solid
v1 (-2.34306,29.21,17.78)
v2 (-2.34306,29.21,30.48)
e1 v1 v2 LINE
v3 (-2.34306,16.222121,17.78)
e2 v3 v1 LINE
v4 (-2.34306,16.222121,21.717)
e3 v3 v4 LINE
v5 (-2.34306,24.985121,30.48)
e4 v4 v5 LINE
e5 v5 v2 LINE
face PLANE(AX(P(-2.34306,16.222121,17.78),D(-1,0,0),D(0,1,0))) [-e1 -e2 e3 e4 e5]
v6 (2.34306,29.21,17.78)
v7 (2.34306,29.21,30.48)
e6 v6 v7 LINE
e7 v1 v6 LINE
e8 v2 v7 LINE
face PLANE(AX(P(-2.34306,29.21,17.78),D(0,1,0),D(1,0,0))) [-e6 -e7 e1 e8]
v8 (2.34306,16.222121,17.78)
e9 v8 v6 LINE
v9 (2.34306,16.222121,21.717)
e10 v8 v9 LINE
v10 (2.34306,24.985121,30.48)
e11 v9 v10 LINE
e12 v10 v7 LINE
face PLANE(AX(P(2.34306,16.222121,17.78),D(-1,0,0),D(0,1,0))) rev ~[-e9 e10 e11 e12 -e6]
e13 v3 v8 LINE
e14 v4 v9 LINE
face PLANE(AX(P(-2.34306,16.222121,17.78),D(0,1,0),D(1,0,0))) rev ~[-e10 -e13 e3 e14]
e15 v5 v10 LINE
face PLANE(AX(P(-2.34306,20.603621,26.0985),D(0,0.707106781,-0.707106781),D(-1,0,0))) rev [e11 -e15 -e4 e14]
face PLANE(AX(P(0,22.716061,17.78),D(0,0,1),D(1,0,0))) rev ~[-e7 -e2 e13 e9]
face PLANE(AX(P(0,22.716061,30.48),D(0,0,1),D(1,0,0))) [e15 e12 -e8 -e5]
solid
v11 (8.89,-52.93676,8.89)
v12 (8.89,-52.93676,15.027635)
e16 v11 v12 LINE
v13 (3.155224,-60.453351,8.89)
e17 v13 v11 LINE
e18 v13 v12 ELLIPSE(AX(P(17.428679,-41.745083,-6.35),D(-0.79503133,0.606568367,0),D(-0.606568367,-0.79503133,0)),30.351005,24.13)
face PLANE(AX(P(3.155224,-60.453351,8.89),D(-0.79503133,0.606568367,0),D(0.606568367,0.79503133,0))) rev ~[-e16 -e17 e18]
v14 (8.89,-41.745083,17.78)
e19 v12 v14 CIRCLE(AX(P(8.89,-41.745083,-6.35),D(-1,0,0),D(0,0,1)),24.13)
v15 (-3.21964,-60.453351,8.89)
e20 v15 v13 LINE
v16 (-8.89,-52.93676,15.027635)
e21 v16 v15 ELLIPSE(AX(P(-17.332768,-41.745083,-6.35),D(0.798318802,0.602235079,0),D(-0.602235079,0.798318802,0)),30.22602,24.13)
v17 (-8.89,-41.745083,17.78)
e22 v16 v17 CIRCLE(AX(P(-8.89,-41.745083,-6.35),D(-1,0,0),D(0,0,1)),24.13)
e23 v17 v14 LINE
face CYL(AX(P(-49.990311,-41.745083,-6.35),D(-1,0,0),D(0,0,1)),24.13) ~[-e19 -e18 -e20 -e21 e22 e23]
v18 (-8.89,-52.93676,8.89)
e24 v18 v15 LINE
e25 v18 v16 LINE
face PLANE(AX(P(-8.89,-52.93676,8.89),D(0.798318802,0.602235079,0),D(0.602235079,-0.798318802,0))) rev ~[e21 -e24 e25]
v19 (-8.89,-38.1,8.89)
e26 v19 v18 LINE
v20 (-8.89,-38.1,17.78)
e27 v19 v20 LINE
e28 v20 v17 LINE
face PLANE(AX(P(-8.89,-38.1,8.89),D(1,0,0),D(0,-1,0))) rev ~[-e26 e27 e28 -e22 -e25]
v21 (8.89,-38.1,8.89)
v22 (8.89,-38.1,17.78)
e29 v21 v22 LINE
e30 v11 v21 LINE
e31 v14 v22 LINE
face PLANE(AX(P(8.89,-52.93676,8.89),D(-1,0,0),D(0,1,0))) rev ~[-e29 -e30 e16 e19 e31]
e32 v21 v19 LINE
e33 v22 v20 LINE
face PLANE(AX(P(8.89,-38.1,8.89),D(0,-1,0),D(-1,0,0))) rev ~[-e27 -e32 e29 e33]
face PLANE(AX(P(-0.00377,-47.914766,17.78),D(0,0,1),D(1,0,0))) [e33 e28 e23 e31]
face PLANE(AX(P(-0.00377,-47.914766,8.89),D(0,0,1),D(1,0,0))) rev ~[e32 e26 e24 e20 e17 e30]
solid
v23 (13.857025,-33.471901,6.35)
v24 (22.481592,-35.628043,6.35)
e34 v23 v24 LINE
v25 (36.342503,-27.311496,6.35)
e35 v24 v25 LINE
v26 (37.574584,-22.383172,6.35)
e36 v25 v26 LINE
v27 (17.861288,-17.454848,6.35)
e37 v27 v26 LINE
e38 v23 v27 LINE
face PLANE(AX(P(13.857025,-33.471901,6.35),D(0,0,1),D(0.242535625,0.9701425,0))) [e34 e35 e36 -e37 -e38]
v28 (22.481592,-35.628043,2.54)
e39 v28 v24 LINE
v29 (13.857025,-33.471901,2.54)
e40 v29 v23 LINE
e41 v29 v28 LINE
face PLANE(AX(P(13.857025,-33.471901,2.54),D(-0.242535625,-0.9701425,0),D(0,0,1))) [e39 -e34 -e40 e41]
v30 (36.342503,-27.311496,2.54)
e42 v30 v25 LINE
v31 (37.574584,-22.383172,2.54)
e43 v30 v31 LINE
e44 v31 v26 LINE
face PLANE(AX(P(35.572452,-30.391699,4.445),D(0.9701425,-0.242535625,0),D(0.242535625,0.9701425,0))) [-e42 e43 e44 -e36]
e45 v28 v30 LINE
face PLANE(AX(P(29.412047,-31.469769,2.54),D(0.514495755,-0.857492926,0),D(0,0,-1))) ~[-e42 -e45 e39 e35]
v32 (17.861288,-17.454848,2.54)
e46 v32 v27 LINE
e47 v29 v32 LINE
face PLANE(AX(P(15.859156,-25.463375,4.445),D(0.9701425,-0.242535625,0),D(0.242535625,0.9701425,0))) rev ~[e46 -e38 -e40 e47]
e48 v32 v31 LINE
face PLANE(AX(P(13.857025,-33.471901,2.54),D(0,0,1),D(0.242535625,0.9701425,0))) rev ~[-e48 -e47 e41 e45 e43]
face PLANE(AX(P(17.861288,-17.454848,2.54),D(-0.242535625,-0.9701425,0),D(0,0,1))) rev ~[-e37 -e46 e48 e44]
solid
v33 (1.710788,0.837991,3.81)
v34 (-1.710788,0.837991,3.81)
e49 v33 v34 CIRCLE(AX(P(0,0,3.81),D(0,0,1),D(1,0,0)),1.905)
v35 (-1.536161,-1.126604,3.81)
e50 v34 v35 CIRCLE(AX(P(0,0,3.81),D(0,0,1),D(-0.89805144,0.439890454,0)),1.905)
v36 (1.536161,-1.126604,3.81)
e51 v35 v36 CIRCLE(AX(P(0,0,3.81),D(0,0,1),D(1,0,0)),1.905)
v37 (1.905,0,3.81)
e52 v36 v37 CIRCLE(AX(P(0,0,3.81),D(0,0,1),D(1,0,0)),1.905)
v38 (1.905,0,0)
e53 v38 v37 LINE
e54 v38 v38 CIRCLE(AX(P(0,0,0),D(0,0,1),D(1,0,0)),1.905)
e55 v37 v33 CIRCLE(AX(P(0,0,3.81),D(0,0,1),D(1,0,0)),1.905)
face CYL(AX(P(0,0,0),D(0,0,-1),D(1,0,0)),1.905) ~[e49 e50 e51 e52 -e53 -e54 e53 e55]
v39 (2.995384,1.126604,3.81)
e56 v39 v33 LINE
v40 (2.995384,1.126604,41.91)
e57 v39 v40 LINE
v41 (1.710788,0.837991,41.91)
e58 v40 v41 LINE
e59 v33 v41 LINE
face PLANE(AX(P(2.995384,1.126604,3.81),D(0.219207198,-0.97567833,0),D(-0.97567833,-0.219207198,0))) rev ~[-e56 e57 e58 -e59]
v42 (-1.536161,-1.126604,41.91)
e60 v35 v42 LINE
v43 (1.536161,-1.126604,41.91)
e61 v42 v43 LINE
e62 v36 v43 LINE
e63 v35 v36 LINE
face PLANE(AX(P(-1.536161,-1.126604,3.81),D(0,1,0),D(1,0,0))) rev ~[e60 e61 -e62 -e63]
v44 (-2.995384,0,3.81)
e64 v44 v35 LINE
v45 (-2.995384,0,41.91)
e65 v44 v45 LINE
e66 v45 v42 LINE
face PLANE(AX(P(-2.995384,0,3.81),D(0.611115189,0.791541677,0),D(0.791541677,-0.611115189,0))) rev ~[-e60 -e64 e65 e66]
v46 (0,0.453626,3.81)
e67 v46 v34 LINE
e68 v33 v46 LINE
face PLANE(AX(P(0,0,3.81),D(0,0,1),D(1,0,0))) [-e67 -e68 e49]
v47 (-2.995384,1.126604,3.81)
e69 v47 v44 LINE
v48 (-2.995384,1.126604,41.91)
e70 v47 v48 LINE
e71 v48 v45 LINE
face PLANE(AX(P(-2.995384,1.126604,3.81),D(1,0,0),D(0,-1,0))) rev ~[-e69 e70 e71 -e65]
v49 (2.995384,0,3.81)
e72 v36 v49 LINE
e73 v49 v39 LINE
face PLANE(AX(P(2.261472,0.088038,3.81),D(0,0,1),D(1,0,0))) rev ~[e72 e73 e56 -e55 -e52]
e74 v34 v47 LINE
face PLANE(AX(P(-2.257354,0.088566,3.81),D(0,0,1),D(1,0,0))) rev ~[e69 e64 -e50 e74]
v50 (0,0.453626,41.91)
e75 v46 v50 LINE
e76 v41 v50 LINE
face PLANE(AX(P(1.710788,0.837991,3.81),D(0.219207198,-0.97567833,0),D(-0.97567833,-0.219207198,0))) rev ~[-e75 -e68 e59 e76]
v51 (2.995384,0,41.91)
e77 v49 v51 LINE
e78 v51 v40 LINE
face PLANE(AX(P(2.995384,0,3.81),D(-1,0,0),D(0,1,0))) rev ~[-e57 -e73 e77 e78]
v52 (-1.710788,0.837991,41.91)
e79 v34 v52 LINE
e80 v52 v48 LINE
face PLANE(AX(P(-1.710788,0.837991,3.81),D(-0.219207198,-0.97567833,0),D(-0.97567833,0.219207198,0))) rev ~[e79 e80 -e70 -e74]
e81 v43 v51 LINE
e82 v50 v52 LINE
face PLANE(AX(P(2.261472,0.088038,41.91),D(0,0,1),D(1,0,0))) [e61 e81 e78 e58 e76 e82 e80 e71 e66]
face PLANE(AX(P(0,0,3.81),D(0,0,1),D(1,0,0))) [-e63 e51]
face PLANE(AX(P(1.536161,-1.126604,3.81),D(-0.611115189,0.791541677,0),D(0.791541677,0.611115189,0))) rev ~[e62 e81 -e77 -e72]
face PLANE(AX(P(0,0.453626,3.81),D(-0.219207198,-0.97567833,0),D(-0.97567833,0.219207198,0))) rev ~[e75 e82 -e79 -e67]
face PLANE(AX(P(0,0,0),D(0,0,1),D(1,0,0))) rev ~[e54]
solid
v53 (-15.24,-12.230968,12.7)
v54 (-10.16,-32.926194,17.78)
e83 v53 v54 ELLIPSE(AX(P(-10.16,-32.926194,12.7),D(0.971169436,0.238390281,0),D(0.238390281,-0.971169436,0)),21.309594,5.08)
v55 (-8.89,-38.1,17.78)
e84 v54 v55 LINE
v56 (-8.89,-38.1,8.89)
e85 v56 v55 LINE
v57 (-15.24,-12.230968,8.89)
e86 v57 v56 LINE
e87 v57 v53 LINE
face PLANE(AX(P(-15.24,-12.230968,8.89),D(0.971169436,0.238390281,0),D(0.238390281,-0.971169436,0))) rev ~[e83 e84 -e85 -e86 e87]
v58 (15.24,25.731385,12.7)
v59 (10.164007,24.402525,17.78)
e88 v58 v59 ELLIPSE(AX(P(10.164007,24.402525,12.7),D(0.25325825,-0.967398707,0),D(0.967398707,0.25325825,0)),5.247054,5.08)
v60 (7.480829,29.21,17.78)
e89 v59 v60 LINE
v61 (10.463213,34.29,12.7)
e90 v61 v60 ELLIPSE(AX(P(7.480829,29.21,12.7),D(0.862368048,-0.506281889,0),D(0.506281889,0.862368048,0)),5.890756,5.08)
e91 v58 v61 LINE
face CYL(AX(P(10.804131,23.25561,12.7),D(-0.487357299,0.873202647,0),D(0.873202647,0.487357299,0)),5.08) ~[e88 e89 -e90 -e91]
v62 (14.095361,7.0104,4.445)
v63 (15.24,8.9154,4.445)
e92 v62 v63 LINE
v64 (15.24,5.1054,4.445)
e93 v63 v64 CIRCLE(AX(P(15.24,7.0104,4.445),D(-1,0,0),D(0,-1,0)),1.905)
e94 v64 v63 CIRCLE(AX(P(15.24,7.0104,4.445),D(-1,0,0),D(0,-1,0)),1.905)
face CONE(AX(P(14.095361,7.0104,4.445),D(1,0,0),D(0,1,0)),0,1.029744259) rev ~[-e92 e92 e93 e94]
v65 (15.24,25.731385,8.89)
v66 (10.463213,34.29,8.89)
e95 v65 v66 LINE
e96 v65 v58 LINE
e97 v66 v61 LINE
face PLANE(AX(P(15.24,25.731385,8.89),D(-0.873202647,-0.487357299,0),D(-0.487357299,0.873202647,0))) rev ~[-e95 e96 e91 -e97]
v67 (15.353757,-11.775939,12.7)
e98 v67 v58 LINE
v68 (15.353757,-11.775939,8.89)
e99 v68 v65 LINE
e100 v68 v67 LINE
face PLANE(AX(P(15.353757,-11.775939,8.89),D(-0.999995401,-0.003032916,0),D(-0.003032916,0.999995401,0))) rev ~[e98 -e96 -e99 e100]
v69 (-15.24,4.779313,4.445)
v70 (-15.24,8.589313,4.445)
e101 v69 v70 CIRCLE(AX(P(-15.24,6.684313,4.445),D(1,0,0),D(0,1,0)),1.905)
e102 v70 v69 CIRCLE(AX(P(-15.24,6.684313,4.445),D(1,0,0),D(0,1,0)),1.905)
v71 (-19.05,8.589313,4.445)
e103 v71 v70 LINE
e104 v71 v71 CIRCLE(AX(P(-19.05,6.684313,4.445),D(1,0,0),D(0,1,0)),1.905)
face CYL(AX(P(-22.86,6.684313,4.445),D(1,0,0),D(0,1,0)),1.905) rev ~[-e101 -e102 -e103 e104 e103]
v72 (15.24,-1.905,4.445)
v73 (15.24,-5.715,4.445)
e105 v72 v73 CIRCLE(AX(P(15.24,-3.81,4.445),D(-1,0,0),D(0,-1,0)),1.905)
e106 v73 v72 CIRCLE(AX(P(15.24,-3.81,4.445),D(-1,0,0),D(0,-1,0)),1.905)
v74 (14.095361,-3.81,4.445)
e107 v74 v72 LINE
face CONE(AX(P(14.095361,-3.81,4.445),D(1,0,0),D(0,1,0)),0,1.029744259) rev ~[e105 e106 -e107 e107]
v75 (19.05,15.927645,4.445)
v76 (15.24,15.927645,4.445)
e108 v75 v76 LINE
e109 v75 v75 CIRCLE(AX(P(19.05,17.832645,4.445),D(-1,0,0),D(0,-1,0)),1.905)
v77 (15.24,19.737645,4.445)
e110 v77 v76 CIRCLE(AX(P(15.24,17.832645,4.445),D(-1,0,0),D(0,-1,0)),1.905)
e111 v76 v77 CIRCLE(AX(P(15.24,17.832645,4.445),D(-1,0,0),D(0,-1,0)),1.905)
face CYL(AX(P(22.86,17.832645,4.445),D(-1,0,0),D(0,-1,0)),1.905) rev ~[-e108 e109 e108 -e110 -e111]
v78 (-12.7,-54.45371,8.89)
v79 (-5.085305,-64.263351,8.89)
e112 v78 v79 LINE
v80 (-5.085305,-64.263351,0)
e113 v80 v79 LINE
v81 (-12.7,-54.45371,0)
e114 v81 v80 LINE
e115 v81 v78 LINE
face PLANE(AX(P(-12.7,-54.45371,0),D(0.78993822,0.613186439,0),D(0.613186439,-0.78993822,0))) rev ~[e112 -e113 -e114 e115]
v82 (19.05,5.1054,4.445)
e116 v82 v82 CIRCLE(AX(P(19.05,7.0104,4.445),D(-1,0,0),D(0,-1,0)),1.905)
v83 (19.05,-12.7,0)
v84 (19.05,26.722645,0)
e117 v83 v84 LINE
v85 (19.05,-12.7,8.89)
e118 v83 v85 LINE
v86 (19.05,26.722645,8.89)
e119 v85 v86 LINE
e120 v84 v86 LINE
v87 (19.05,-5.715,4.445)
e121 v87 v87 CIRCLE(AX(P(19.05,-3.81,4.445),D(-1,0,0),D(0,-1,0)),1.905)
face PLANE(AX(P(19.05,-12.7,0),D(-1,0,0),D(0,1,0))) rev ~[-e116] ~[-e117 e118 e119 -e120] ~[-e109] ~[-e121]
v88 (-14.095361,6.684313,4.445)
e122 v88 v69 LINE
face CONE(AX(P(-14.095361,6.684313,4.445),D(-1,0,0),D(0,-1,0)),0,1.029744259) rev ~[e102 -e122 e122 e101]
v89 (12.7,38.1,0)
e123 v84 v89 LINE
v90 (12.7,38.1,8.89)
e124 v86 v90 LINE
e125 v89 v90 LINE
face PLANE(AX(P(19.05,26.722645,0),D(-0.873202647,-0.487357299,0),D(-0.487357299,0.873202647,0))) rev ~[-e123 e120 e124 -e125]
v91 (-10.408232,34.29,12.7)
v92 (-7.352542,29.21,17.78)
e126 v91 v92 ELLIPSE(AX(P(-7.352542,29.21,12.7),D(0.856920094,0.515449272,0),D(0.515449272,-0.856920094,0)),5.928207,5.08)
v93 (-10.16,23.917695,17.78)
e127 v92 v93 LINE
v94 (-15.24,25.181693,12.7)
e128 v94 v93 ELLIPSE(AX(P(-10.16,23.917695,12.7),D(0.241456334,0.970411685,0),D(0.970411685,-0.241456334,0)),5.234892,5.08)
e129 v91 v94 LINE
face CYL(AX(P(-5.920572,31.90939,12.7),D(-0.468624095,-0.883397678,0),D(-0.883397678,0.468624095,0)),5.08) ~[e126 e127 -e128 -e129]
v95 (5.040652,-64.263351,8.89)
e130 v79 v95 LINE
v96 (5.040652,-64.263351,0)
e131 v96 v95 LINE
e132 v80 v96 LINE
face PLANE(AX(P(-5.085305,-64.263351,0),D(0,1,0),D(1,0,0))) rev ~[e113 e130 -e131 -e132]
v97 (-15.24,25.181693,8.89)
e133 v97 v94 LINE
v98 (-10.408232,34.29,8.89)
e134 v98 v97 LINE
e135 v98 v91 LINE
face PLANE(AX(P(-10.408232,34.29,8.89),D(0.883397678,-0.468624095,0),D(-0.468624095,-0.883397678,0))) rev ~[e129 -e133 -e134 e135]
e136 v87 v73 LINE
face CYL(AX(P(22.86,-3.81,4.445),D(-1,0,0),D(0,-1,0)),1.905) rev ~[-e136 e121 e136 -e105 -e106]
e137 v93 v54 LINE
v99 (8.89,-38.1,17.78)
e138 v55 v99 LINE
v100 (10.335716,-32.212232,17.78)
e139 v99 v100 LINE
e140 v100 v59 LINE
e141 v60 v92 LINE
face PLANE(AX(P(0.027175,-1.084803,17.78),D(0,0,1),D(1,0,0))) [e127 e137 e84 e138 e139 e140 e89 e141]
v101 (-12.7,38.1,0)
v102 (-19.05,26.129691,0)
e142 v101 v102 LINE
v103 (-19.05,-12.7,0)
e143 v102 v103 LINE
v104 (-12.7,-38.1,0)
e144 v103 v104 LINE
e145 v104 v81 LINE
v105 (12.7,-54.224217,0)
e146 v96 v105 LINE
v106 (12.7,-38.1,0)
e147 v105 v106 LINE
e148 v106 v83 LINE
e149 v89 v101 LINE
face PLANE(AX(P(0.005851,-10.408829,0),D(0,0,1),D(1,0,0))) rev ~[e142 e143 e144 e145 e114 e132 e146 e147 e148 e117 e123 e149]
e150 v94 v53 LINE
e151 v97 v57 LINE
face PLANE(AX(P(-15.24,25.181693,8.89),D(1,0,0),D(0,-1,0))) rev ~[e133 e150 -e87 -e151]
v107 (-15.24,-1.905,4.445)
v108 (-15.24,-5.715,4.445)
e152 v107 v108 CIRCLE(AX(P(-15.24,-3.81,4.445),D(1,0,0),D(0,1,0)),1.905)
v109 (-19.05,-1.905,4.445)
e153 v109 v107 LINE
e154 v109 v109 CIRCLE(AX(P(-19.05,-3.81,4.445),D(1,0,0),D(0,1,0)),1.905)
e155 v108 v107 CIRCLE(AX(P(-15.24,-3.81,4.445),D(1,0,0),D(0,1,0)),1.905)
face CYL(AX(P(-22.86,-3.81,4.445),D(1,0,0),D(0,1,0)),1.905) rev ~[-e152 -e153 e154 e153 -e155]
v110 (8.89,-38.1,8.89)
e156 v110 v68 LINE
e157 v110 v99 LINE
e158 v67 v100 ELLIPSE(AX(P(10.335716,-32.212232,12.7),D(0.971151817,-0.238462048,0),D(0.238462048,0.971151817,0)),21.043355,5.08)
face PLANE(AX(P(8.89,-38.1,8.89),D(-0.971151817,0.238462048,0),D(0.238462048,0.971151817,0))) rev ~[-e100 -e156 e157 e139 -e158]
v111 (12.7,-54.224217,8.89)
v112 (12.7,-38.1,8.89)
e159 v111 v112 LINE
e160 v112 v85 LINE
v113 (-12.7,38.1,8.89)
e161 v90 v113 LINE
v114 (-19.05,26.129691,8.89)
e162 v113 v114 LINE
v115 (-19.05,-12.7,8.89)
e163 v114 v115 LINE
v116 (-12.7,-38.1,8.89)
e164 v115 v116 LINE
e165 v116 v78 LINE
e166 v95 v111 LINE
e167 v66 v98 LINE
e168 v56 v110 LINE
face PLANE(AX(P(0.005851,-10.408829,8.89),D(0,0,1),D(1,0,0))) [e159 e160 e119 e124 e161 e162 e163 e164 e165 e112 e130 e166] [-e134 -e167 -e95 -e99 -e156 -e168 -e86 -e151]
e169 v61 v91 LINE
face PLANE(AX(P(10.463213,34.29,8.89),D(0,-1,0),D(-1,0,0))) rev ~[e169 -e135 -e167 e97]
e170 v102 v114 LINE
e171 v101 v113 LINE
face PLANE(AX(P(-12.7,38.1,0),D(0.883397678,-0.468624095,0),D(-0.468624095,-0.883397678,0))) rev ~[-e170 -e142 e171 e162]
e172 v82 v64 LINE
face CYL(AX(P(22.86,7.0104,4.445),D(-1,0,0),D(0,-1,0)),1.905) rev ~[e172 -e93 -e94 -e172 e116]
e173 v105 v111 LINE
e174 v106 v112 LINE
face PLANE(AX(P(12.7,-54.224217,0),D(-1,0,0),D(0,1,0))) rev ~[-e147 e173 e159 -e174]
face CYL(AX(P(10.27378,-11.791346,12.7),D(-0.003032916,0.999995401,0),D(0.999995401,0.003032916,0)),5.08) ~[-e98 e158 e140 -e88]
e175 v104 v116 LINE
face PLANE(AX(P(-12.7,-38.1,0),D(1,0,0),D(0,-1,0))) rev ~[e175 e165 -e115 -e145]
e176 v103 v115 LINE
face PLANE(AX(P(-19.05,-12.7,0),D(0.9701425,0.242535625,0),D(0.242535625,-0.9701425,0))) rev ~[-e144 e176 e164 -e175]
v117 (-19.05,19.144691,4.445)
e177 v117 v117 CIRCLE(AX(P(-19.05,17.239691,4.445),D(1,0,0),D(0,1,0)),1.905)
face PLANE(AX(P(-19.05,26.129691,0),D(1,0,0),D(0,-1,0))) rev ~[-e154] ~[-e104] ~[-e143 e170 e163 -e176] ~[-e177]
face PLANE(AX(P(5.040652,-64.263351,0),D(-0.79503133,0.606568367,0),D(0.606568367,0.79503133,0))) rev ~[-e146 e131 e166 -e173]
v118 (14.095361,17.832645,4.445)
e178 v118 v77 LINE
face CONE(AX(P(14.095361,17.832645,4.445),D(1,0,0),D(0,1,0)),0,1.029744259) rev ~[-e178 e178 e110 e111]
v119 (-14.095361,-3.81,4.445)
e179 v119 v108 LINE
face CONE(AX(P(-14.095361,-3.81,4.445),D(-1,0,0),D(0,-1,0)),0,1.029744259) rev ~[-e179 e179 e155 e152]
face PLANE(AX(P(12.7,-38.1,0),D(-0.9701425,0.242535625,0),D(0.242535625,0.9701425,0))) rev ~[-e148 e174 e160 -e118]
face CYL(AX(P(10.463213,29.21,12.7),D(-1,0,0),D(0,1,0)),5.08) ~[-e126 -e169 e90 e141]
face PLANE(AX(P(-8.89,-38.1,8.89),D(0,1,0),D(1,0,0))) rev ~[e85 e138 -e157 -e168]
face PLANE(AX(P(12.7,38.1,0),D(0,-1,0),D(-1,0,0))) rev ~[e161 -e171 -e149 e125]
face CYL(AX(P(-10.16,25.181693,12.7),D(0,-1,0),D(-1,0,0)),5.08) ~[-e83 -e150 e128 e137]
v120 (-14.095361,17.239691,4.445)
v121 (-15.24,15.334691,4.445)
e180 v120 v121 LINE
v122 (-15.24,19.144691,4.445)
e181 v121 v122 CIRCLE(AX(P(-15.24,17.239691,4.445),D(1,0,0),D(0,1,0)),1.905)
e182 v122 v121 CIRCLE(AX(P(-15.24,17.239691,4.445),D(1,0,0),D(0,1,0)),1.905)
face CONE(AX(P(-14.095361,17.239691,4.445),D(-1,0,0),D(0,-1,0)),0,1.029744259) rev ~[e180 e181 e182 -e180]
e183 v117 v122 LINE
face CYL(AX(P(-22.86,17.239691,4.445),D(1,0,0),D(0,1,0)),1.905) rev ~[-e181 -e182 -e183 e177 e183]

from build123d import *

# Parameters (mm, degrees)
F1_DEPTH    = 8.89
F3_DEPTH    = 8.89
F4_T1_DEPTH = 99.9162053314
F5_DEPTH    = 8.89
F6_R        = 5.08
F8_D        = 3.81
F8_DEPTH    = 3.81
F8_TIP      = 1.1446394792
F10_D       = 3.81
F10_DEPTH   = 3.81
F10_TIP     = 1.1446394792
F11_R       = 1.905
F12_DEPTH   = 3.81
F14_DEPTH   = 38.1
F15_DEPTH   = 38.1
F16_DEPTH   = 38.1
F17_W       = 4.6861195005
F17_H       = 12.987878806
F18_DEPTH   = 12.7
F19_SIZE    = 8.763
F20_W       = 16.51
F20_H       = 3.81
F21_DEPTH   = 20.32
F22_SIZE    = 11.43


# Not quite as in the source:
# - a fillet or chamfer that OpenCascade refuses, or shapes differently, is made with other operations: its cross-section is extruded or revolved along the edge and cut away or added


with BuildPart() as f1:
    # F0 (on Top) → F1 (new body)
    with BuildSketch(Plane.XY):
        Polygon((19.05, 26.7226453871), (12.7, 38.1), (-12.7, 38.1), (-19.05, 26.1296909302), (-19.05, -12.7), (-12.7, -38.1), (-12.7, -54.4537100359), (-5.0853045448, -64.2633512616), (5.0406523641, -64.2633512616), (12.7, -54.2242169015), (12.7, -38.1), (19.05, -12.7), align=None)
    extrude(amount=F1_DEPTH)

    # F2 (on face) → F5 (join)
    with BuildSketch(Plane.XY.offset(8.89)):
        Polygon((-15.24, -12.2309675664), (-8.89, -38.1), (8.89, -38.1), (15.3537570744, -11.7759392686), (15.24, 25.7313851458), (10.4632125856, 34.29), (-10.4082323758, 34.29), (-15.24, 25.1816926275), align=None)
    extrude(amount=F5_DEPTH)

    # F6
    f6_edges = [f1.edges().sort_by_distance(p)[0] for p in [
        (-15.24, 6.475363, 17.78),
        (15.296879, 6.977723, 17.78),
        (-12.824116, 29.735846, 17.78),
        (12.851606, 30.010693, 17.78),
        (0.02749, 34.29, 17.78),
    ]]
    fillet(f6_edges, radius=F6_R)

    # F8
    with Locations(Plane.YZ.offset(19.05)):
        with Locations((-3.81, 4.445), (7.0104, 4.445), (17.8326453871, 4.445)):
            Hole(F8_D / 2, depth=F8_DEPTH)
            with Locations((0, 0, -(F8_DEPTH + F8_TIP / 2))):  # 118° drill point
                Cone(0, F8_D / 2, F8_TIP, mode=Mode.SUBTRACT)

    # F10
    with Locations(Plane(origin=(-19.05, 0, 0), x_dir=(0, -1, 0), z_dir=(-1, 0, 0))):
        with Locations((-17.2396909302, 4.445), (-6.684313026, 4.445), (3.81, 4.445)):
            Hole(F10_D / 2, depth=F10_DEPTH)
            with Locations((0, 0, -(F10_DEPTH + F10_TIP / 2))):  # 118° drill point
                Cone(0, F10_D / 2, F10_TIP, mode=Mode.SUBTRACT)


with BuildPart() as f3:
    # F2 (on face) → F3 (new body)
    with BuildSketch(Plane.XY.offset(8.89)):
        Polygon((8.89, -38.1), (-8.89, -38.1), (-8.89, -52.936759997), (-3.2196400783, -60.4533512616), (-0.0223260903, -60.4533512616), (3.1552241252, -60.4533512616), (8.89, -52.936759997), align=None)
    extrude(amount=F3_DEPTH)

    # F4: fillet of radius 24.13 on 1 edges, made by hand

    # F4_s2 → F4_t1 (cut)
    with BuildSketch(Plane.YZ.offset(-49.9903106423)):
        with BuildLine():
            ThreePointArc((-41.745083036, 17.78), (-52.1016196193, 15.4444729232), (-60.4533512616, 8.89))
            Line((-60.4533512616, 8.89), (-60.4533512616, 17.78))
            Line((-60.4533512616, 17.78), (-41.745083036, 17.78))
        make_face()
    extrude(amount=F4_T1_DEPTH, mode=Mode.SUBTRACT)


with BuildPart() as f12:
    # F11 (on Top) → F12 (new body)
    with BuildSketch(Plane.XY):
        Circle(F11_R)
    extrude(amount=F12_DEPTH)

    # F13 (on face) → F14 (join)
    with BuildSketch(Plane.XY.offset(3.81)):
        with BuildLine():
            Line((0, -1.1266035726), (1.5361606004, -1.1266035726))
            ThreePointArc((1.5361606004, -1.1266035726), (1.8104434462, -0.592722134), (1.905, 0))
            ThreePointArc((1.905, 0), (1.8558119687, 0.4301010776), (1.7107879927, 0.837991315))
            Line((1.7107879927, 0.837991315), (0, 0.4536258639))
            Line((0, 0.4536258639), (-1.7107879927, 0.837991315))
            ThreePointArc((-1.7107879927, 0.837991315), (-1.8975186586, -0.1686651723), (-1.5361606004, -1.1266035726))
            Line((-1.5361606004, -1.1266035726), (0, -1.1266035726))
        make_face()
    extrude(amount=F14_DEPTH)

    # F13 (on face) → F15 (join)
    with BuildSketch(Plane.XY.offset(3.81)):
        with BuildLine():
            Line((-2.9953841586, 0), (-1.5361606004, -1.1266035726))
            ThreePointArc((-1.5361606004, -1.1266035726), (-1.8975186586, -0.1686651723), (-1.7107879927, 0.837991315))
            Line((-1.7107879927, 0.837991315), (-2.9953841586, 1.1266035726))
            Line((-2.9953841586, 1.1266035726), (-2.9953841586, 0))
        make_face()
    extrude(amount=F15_DEPTH)

    # F13 (on face) → F16 (join)
    with BuildSketch(Plane.XY.offset(3.81)):
        with BuildLine():
            ThreePointArc((1.905, 0), (1.8104434462, -0.592722134), (1.5361606004, -1.1266035726))
            Line((1.5361606004, -1.1266035726), (2.9953841586, 0))
            Line((2.9953841586, 0), (2.9953841586, 1.1266035726))
            Line((2.9953841586, 1.1266035726), (1.7107879927, 0.837991315))
            ThreePointArc((1.7107879927, 0.837991315), (1.8558119687, 0.4301010776), (1.905, 0))
        make_face()
    extrude(amount=F16_DEPTH)


with BuildPart() as f18:
    # F17 (on face) → F18 (new body)
    with BuildSketch(Plane.XY.offset(17.78)):
        with Locations((0, 22.716060597)):
            Rectangle(F17_W, F17_H)
    extrude(amount=F18_DEPTH)

    # F19
    f19_edges = [f18.edges().sort_by_distance(p)[0] for p in [
        (0, 16.222121, 30.48),
    ]]
    chamfer(f19_edges, length=F19_SIZE)


with BuildPart() as f21:
    # F20 (on face) → F21 (new body)
    with BuildSketch(Plane(origin=(20.9176470588, -5.2294117647, 0), x_dir=(0.242535625, 0.9701425001, 0), z_dir=(0.9701425001, -0.242535625, 0))):
        with Locations((-20.8566915244, 4.445)):
            Rectangle(F20_W, F20_H)
    extrude(amount=F21_DEPTH)

    # F22
    f22_edges = [f21.edges().sort_by_distance(p)[0] for p in [
        (33.57032, -38.400225, 4.445),
    ]]
    chamfer(f22_edges, length=F22_SIZE)


solid = Compound([f1.part, f3.part, f12.part, f18.part, f21.part])
